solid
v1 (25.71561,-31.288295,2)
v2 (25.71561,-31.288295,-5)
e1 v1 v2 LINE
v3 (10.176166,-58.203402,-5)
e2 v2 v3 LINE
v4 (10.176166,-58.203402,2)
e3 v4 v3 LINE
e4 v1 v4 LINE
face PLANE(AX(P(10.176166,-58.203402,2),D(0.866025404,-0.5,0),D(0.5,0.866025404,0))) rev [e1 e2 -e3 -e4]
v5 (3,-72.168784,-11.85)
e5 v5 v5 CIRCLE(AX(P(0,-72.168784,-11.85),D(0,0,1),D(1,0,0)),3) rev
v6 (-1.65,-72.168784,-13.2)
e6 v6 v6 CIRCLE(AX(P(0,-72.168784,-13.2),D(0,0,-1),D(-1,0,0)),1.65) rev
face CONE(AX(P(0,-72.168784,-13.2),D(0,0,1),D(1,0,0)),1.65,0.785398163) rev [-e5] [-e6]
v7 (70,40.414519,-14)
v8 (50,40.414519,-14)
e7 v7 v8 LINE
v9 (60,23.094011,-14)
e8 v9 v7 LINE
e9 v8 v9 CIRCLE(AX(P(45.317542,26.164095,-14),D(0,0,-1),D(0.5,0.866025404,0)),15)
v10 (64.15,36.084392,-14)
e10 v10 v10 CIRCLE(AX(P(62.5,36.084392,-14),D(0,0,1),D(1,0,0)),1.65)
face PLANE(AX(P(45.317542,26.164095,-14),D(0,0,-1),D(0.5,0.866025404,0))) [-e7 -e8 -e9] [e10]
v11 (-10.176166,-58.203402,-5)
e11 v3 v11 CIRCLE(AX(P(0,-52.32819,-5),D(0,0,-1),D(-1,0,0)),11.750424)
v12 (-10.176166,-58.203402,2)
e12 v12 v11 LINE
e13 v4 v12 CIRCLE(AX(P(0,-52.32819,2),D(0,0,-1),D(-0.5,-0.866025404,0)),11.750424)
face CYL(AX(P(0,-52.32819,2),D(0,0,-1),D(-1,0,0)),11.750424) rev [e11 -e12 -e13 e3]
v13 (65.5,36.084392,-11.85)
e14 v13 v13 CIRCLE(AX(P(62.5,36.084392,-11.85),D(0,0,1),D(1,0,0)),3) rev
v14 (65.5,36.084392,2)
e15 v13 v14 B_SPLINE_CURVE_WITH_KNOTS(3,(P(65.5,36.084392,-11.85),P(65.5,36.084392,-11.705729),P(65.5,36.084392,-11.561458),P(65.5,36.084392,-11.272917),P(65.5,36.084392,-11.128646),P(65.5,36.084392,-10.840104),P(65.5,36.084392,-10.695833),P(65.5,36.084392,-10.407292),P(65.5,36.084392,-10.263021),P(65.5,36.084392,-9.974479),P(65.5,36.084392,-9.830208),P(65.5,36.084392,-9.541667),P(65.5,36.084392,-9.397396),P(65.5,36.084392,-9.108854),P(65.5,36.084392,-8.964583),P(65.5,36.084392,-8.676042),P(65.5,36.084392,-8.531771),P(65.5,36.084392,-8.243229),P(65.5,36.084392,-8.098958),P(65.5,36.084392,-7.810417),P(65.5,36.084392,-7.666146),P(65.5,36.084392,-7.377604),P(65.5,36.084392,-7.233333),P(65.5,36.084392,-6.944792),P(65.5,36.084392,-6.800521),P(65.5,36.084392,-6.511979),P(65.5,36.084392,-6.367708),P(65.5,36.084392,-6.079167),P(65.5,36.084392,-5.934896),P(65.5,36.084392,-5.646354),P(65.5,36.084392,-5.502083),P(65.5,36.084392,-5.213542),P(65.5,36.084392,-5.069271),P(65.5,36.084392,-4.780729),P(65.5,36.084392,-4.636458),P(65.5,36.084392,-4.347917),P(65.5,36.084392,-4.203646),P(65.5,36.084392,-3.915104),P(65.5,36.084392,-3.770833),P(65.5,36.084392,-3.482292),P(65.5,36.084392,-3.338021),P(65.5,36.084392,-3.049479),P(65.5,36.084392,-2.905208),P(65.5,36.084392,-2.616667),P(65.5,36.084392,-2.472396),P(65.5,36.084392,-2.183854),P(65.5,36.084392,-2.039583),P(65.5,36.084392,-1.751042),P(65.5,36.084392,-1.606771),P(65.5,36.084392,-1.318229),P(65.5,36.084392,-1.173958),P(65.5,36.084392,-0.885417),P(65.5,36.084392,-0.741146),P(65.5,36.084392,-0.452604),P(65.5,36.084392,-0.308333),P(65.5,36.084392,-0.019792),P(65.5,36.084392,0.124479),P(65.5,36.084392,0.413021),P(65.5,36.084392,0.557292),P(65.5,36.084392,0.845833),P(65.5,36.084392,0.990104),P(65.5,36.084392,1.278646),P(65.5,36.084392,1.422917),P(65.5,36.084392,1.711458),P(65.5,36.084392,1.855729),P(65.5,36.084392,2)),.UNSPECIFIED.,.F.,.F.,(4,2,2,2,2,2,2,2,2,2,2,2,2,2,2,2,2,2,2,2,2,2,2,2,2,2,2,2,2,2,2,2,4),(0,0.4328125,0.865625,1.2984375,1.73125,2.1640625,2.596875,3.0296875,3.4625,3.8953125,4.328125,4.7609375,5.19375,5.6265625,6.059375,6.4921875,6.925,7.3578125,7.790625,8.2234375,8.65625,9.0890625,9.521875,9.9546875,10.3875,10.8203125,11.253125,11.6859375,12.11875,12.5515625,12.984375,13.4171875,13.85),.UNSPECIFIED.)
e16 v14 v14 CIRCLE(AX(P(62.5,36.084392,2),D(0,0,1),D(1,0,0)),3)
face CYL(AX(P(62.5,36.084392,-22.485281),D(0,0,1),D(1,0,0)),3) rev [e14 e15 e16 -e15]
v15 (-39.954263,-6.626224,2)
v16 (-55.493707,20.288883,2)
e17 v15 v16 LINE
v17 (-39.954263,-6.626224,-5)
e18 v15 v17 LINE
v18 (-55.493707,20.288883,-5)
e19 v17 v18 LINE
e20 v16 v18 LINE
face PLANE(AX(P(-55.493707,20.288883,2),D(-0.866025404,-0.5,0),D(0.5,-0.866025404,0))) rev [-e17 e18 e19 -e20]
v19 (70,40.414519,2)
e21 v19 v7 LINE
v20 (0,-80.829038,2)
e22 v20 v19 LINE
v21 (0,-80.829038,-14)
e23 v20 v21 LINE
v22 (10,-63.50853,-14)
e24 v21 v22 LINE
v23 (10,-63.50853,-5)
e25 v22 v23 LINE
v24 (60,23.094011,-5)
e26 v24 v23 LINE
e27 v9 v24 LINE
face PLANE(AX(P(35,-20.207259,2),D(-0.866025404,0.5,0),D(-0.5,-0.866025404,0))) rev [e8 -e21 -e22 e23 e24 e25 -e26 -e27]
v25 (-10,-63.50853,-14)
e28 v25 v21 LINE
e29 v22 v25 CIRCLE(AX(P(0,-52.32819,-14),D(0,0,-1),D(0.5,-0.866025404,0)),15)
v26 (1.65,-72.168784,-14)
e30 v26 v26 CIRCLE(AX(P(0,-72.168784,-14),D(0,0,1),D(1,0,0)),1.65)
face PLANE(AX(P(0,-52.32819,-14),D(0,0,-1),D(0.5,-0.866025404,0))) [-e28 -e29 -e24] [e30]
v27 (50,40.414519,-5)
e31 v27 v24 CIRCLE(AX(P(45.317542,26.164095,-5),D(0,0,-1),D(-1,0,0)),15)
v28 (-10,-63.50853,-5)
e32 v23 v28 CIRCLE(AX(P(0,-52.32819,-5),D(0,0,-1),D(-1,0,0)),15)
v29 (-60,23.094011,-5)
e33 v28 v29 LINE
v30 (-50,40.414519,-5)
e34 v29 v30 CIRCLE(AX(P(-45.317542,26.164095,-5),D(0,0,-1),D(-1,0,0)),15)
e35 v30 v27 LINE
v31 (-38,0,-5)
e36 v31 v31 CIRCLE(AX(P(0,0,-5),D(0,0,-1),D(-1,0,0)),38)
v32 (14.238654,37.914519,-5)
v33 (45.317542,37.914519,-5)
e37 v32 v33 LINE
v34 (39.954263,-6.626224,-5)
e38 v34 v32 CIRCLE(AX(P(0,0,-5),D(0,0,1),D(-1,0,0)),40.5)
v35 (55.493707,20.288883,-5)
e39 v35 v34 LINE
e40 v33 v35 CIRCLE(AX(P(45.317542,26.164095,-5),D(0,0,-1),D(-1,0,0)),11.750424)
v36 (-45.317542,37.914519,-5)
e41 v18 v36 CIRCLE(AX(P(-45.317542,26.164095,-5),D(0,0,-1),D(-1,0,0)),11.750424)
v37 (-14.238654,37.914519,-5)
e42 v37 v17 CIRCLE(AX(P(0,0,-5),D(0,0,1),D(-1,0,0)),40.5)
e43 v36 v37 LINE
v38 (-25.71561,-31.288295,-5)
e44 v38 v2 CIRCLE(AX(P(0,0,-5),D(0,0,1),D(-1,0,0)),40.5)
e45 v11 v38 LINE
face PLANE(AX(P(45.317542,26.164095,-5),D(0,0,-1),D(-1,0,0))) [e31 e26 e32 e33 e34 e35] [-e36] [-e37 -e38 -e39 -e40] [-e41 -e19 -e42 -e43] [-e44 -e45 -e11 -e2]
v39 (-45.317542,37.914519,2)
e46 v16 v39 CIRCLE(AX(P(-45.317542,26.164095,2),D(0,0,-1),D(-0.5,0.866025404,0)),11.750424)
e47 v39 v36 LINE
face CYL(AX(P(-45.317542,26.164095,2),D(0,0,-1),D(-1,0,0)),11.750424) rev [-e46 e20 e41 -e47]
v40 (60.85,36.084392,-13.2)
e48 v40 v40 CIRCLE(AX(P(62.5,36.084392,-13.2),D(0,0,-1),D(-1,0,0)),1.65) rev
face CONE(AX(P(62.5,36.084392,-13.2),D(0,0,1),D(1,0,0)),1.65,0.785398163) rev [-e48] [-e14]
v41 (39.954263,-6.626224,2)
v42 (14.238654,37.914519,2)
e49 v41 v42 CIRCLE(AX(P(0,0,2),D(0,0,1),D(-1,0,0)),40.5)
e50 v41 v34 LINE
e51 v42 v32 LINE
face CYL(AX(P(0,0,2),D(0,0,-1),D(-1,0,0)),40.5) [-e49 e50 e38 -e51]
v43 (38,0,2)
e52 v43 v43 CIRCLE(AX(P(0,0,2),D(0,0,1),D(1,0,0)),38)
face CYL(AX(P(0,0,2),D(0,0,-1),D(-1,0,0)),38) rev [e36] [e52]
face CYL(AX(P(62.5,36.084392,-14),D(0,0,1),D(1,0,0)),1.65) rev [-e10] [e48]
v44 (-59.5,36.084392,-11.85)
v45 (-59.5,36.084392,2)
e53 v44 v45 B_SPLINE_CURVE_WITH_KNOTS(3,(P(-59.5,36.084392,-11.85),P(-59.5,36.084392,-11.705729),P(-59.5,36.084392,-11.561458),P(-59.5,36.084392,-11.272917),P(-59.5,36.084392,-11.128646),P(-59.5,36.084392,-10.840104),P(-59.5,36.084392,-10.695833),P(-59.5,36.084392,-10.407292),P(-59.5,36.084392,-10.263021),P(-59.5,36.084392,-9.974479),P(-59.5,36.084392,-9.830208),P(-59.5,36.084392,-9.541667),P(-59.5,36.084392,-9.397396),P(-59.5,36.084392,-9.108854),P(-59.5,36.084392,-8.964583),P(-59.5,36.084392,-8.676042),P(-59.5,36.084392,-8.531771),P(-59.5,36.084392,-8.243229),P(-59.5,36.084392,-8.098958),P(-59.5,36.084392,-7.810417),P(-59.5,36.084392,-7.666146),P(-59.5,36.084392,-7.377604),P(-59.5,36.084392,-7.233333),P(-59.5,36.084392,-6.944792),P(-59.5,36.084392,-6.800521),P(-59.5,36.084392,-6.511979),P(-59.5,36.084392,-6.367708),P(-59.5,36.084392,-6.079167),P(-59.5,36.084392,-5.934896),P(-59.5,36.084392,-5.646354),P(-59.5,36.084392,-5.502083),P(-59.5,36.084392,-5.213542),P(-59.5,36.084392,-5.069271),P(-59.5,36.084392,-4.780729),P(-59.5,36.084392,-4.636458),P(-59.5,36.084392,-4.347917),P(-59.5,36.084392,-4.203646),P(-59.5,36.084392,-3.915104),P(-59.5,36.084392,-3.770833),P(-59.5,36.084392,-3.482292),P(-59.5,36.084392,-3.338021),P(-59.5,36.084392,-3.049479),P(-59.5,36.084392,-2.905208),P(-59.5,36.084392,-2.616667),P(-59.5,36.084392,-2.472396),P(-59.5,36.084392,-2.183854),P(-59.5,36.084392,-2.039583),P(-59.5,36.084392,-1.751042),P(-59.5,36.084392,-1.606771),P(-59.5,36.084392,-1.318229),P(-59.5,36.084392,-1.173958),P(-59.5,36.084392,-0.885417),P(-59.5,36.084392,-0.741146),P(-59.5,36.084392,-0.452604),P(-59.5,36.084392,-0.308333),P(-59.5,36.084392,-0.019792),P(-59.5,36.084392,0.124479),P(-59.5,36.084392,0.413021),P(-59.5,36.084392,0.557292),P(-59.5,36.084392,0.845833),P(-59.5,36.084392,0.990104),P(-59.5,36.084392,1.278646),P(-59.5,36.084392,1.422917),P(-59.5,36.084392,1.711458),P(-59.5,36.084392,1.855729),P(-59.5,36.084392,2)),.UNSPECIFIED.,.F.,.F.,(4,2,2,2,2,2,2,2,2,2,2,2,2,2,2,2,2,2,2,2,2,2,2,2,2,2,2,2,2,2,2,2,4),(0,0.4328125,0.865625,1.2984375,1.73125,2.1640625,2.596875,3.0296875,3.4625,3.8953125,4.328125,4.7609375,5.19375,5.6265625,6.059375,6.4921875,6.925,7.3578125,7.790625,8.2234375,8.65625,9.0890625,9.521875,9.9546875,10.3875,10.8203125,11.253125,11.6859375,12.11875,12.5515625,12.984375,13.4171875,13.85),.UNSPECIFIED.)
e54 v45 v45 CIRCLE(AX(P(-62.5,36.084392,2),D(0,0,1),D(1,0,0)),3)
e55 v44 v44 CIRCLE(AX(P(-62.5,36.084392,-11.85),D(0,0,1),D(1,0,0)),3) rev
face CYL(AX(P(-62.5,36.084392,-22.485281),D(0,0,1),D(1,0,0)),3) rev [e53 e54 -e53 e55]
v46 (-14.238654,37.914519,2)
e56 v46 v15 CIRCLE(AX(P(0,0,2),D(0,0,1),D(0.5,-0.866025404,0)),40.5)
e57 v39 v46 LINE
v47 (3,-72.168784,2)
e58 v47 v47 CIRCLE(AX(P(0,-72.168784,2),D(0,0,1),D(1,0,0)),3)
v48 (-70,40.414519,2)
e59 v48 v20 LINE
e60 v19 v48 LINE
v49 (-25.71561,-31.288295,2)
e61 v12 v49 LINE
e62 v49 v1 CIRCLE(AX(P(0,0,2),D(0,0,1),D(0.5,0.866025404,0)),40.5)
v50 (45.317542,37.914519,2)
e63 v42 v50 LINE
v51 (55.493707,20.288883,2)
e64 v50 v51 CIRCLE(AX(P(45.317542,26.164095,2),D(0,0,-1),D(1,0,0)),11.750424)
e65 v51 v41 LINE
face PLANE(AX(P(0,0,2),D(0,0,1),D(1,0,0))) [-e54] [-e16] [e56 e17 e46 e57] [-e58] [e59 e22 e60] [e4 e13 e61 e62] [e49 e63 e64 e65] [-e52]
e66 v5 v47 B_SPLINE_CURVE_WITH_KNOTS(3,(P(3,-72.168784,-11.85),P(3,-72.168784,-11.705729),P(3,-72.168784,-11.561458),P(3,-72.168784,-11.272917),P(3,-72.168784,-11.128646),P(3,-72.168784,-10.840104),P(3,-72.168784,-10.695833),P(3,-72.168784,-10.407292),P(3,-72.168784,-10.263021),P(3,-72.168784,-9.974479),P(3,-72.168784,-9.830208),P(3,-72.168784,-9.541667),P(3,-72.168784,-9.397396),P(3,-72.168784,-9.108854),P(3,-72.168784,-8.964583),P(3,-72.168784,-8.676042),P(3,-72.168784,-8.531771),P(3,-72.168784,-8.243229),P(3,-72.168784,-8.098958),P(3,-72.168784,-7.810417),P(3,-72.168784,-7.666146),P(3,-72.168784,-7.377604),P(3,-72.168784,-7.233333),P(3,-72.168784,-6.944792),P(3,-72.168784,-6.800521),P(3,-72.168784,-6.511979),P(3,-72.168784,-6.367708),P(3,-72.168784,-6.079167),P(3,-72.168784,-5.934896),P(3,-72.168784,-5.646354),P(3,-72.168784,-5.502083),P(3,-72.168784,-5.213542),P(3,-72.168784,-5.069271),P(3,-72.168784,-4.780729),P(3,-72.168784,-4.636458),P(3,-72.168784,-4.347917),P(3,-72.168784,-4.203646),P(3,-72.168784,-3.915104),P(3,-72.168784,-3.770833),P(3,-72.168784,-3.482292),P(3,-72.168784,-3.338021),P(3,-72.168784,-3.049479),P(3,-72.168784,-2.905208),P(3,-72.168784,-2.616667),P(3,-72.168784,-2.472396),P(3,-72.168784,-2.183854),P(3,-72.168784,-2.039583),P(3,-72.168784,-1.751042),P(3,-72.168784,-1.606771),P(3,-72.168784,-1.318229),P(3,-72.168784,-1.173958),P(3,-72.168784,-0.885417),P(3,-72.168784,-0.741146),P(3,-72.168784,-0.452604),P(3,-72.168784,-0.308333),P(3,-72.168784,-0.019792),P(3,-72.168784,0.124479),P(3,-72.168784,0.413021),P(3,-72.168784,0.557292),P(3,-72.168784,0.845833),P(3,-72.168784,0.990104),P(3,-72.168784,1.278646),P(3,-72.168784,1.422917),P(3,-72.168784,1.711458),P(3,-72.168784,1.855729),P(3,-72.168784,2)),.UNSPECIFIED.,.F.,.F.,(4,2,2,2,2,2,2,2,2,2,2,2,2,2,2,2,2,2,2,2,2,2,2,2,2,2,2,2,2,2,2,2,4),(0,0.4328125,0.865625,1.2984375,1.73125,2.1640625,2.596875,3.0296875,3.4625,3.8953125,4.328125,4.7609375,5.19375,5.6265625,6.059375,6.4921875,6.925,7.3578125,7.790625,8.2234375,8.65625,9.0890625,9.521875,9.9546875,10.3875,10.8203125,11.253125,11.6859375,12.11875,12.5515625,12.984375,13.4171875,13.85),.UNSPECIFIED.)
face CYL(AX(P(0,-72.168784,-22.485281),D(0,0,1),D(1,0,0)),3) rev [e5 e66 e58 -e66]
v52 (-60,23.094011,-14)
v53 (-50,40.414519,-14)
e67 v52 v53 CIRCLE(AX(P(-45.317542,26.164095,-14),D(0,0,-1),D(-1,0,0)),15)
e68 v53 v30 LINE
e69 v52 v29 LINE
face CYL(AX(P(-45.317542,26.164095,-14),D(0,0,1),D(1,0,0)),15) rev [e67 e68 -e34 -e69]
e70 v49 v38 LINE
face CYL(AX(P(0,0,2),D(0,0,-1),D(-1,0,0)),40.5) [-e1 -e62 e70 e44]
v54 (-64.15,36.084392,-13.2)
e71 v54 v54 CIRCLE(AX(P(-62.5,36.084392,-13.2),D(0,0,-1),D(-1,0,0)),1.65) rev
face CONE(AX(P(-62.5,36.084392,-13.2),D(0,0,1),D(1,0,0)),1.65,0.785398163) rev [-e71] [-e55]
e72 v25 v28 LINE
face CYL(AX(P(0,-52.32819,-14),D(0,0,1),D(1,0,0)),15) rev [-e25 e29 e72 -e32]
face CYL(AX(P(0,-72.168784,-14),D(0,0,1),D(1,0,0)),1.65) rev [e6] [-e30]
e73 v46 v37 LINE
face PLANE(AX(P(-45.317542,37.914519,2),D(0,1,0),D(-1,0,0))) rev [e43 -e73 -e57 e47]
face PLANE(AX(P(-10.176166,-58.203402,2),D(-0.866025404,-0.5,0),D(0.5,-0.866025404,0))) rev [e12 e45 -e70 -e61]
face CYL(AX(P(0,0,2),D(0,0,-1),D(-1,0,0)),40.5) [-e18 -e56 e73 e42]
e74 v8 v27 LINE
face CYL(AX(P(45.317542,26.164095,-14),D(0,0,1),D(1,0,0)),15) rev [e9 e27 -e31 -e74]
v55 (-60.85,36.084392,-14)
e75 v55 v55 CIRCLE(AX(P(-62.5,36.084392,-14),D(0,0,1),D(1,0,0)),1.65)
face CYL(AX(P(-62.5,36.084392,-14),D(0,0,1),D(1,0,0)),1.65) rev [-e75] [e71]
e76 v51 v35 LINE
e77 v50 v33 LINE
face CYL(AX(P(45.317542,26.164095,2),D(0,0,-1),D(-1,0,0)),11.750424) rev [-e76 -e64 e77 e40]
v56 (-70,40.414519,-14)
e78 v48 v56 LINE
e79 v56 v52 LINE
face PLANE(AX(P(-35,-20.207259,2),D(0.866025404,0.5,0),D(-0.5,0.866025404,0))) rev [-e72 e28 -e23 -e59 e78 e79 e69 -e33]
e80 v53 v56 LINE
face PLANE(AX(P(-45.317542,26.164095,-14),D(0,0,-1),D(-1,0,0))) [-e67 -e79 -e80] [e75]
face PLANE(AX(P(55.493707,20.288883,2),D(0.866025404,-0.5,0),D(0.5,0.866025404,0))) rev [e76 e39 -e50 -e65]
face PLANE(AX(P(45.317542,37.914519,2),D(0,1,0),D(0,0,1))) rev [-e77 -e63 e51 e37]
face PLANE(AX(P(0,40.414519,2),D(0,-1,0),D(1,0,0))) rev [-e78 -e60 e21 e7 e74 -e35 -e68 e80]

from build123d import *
from build123d.topology import SkipClean

# Parameters (mm, degrees)
SKETCH1_R           = 38
BOSS_EXTRUDE1_DEPTH = 2
BOSS_EXTRUDE2_DEPTH = 14
CIRPATTERN1_COUNT   = 3
CUT_EXTRUDE1_DEPTH  = 108.839386744
CIRPATTERN3_COUNT   = 3
BOSS_EXTRUDE5_START = 5
SKETCH8_R           = 38
BOSS_EXTRUDE5_DEPTH = 5
SKETCH6_R           = 1.65
CUT_EXTRUDE2_DEPTH  = 109.117220337
SKETCH11_R          = 3
CUT_EXTRUDE3_DEPTH  = 13
CHAMFER1_SIZE       = 2.2


with BuildPart() as part:
    # Sketch1 → Boss-Extrude1 (new body)
    with BuildSketch(Plane.XY):
        Polygon((0, -80.829037687), (70, 40.414518843), (-70, 40.414518843), align=None)
        Circle(SKETCH1_R, mode=Mode.SUBTRACT)
    extrude(amount=BOSS_EXTRUDE1_DEPTH)

    # Sketch2 → Boss-Extrude2 (add)
    with BuildSketch(Plane.XY):
        with BuildLine():
            Line((-50, 40.414518843), (-70, 40.414518843))
            Line((-70, 40.414518843), (-60, 23.094010768))
            ThreePointArc((-60, 23.094010768), (-58.307922691, 33.664094862), (-50, 40.414518843))
        make_face()
    boss_extrude2 = extrude(amount=-BOSS_EXTRUDE2_DEPTH)

    # CirPattern1: Boss-Extrude2 ×3 about axis
    cirpattern1_axis = Axis((0, 0, 0), (0, 0, 1))
    for i in range(1, CIRPATTERN1_COUNT):
        add(boss_extrude2.rotate(cirpattern1_axis, i * 360 / CIRPATTERN1_COUNT))

    # Sketch5 → Cut-Extrude1 (cut, symmetric)
    with BuildSketch(Plane(origin=(0, 0, 0), x_dir=(-1, 0, 0), z_dir=(0, 0, -1))):
        with BuildLine():
            Line((-55.493707308, 20.288882871), (-39.95426337, -6.62622355))
            ThreePointArc((-39.95426337, -6.62622355), (-35.074028853, 20.25), (-14.23865376, 37.914518843))
            Line((-14.23865376, 37.914518843), (-45.317541634, 37.914518843))
            ThreePointArc((-45.317541634, 37.914518843), (-55.493707308, 32.039306852), (-55.493707308, 20.288882871))
        make_face()
    cut_extrude1 = extrude(amount=CUT_EXTRUDE1_DEPTH, both=True, mode=Mode.SUBTRACT)

    # CirPattern3: Cut-Extrude1 ×3 about axis
    cirpattern3_axis = Axis((0, 0, 0), (0, 0, 1))
    for i in range(1, CIRPATTERN3_COUNT):
        add(cut_extrude1.rotate(cirpattern3_axis, i * 360 / CIRPATTERN3_COUNT), mode=Mode.SUBTRACT)

    # Sketch8 → Boss-Extrude5 (add)
    with SkipClean():  # the faces are left unmerged after this step: merging them gives an invalid solid
        with BuildSketch(Plane(origin=(0, 0, 0), x_dir=(-1, 0, 0), z_dir=(0, 0, -1)).offset(BOSS_EXTRUDE5_START)):
            with BuildLine():
                Line((-60, 23.094010768), (-10, -63.508529611))
                ThreePointArc((-10, -63.508529611), (0, -67.328189723), (10, -63.508529611))
                Line((10, -63.508529611), (60, 23.094010768))
                ThreePointArc((60, 23.094010768), (58.307922691, 33.664094862), (50, 40.414518843))
                Line((50, 40.414518843), (-50, 40.414518843))
                ThreePointArc((-50, 40.414518843), (-58.307922691, 33.664094862), (-60, 23.094010768))
            make_face()
            Circle(SKETCH8_R, mode=Mode.SUBTRACT)
            with BuildLine():
                Line((-39.95426337, -6.62622355), (-55.493707308, 20.288882871))
                ThreePointArc((-55.493707308, 20.288882871), (-55.493707308, 32.039306852), (-45.317541634, 37.914518843))
                Line((-45.317541634, 37.914518843), (-14.23865376, 37.914518843))
                ThreePointArc((-14.23865376, 37.914518843), (-35.074028853, 20.25), (-39.95426337, -6.62622355))
            make_face(mode=Mode.SUBTRACT)
            with BuildLine():
                Line((14.23865376, 37.914518843), (45.317541634, 37.914518843))
                ThreePointArc((45.317541634, 37.914518843), (55.493707308, 32.039306852), (55.493707308, 20.288882871))
                Line((55.493707308, 20.288882871), (39.95426337, -6.62622355))
                ThreePointArc((39.95426337, -6.62622355), (35.074028853, 20.25), (14.23865376, 37.914518843))
            make_face(mode=Mode.SUBTRACT)
            with BuildLine():
                Line((25.715609611, -31.288295293), (10.176165673, -58.203401714))
                ThreePointArc((10.176165673, -58.203401714), (0, -64.078613705), (-10.176165673, -58.203401714))
                Line((-10.176165673, -58.203401714), (-25.715609611, -31.288295293))
                ThreePointArc((-25.715609611, -31.288295293), (0, -40.5), (25.715609611, -31.288295293))
            make_face(mode=Mode.SUBTRACT)
        extrude(amount=-BOSS_EXTRUDE5_DEPTH)

    # Sketch6 → Cut-Extrude2 (cut, through all)
    with SkipClean():  # the faces are left unmerged after this step: merging them gives an invalid solid
        with BuildSketch(Plane.XY.offset(2)):
            with Locations((-62.5, 36.084391824)):
                Circle(SKETCH6_R)
            with Locations((62.5, 36.084391824)):
                Circle(SKETCH6_R)
            with Locations((0, -72.168783649)):
                Circle(SKETCH6_R)
        extrude(amount=-CUT_EXTRUDE2_DEPTH, mode=Mode.SUBTRACT)

    # Sketch11 → Cut-Extrude3 (cut)
    with SkipClean():  # the faces are left unmerged after this step: merging them gives an invalid solid
        with BuildSketch(Plane.XY.offset(2)):
            with Locations((-62.5, 36.084391824)):
                Circle(SKETCH11_R)
            with Locations((62.5, 36.084391824)):
                Circle(SKETCH11_R)
            with Locations((0, -72.168783649)):
                Circle(SKETCH11_R)
        extrude(amount=-CUT_EXTRUDE3_DEPTH, mode=Mode.SUBTRACT)

    # Chamfer1
    # the kernel refuses this chamfer: 2.2 mm, written as the material it takes off along each edge
    with BuildSketch(Plane(origin=(0, -72.168783649, -11), x_dir=(1, 0, 0), z_dir=(0, -1, 0))) as chamfer1_piece_1_section:
        Polygon((1.65, -CHAMFER1_SIZE), (1.65 + CHAMFER1_SIZE, 0), (1.65, 0), align=None)
    chamfer1_piece_1 = revolve(axis=Axis((0, -72.168783649, -11), (0, 0, 1)), mode=Mode.PRIVATE)
    chamfer1_piece_1 = chamfer1_piece_1 & Plane(origin=(0, -72.168783649, -12.533940938), x_dir=(1, 0, 0), z_dir=(0, 0, 1)) * Cylinder(3, 16, mode=Mode.PRIVATE)
    add(chamfer1_piece_1, mode=Mode.SUBTRACT)
    with BuildSketch(Plane(origin=(62.5, 36.084391824, -11), x_dir=(1, 0, 0), z_dir=(0, -1, 0))) as chamfer1_piece_2_section:
        Polygon((1.65, -CHAMFER1_SIZE), (1.65 + CHAMFER1_SIZE, 0), (1.65, 0), align=None)
    chamfer1_piece_2 = revolve(axis=Axis((62.5, 36.084391824, -11), (0, 0, 1)), mode=Mode.PRIVATE)
    chamfer1_piece_2 = chamfer1_piece_2 & Plane(origin=(62.5, 36.084391824, -12.533940938), x_dir=(1, 0, 0), z_dir=(0, 0, 1)) * Cylinder(3, 16, mode=Mode.PRIVATE)
    add(chamfer1_piece_2, mode=Mode.SUBTRACT)
    with BuildSketch(Plane(origin=(-62.5, 36.084391824, -11), x_dir=(1, 0, 0), z_dir=(0, -1, 0))) as chamfer1_piece_3_section:
        Polygon((1.65, -CHAMFER1_SIZE), (1.65 + CHAMFER1_SIZE, 0), (1.65, 0), align=None)
    chamfer1_piece_3 = revolve(axis=Axis((-62.5, 36.084391824, -11), (0, 0, 1)), mode=Mode.PRIVATE)
    chamfer1_piece_3 = chamfer1_piece_3 & Plane(origin=(-62.5, 36.084391824, -12.533940938), x_dir=(1, 0, 0), z_dir=(0, 0, 1)) * Cylinder(3, 16, mode=Mode.PRIVATE)
    add(chamfer1_piece_3, mode=Mode.SUBTRACT)


solid = part.part
